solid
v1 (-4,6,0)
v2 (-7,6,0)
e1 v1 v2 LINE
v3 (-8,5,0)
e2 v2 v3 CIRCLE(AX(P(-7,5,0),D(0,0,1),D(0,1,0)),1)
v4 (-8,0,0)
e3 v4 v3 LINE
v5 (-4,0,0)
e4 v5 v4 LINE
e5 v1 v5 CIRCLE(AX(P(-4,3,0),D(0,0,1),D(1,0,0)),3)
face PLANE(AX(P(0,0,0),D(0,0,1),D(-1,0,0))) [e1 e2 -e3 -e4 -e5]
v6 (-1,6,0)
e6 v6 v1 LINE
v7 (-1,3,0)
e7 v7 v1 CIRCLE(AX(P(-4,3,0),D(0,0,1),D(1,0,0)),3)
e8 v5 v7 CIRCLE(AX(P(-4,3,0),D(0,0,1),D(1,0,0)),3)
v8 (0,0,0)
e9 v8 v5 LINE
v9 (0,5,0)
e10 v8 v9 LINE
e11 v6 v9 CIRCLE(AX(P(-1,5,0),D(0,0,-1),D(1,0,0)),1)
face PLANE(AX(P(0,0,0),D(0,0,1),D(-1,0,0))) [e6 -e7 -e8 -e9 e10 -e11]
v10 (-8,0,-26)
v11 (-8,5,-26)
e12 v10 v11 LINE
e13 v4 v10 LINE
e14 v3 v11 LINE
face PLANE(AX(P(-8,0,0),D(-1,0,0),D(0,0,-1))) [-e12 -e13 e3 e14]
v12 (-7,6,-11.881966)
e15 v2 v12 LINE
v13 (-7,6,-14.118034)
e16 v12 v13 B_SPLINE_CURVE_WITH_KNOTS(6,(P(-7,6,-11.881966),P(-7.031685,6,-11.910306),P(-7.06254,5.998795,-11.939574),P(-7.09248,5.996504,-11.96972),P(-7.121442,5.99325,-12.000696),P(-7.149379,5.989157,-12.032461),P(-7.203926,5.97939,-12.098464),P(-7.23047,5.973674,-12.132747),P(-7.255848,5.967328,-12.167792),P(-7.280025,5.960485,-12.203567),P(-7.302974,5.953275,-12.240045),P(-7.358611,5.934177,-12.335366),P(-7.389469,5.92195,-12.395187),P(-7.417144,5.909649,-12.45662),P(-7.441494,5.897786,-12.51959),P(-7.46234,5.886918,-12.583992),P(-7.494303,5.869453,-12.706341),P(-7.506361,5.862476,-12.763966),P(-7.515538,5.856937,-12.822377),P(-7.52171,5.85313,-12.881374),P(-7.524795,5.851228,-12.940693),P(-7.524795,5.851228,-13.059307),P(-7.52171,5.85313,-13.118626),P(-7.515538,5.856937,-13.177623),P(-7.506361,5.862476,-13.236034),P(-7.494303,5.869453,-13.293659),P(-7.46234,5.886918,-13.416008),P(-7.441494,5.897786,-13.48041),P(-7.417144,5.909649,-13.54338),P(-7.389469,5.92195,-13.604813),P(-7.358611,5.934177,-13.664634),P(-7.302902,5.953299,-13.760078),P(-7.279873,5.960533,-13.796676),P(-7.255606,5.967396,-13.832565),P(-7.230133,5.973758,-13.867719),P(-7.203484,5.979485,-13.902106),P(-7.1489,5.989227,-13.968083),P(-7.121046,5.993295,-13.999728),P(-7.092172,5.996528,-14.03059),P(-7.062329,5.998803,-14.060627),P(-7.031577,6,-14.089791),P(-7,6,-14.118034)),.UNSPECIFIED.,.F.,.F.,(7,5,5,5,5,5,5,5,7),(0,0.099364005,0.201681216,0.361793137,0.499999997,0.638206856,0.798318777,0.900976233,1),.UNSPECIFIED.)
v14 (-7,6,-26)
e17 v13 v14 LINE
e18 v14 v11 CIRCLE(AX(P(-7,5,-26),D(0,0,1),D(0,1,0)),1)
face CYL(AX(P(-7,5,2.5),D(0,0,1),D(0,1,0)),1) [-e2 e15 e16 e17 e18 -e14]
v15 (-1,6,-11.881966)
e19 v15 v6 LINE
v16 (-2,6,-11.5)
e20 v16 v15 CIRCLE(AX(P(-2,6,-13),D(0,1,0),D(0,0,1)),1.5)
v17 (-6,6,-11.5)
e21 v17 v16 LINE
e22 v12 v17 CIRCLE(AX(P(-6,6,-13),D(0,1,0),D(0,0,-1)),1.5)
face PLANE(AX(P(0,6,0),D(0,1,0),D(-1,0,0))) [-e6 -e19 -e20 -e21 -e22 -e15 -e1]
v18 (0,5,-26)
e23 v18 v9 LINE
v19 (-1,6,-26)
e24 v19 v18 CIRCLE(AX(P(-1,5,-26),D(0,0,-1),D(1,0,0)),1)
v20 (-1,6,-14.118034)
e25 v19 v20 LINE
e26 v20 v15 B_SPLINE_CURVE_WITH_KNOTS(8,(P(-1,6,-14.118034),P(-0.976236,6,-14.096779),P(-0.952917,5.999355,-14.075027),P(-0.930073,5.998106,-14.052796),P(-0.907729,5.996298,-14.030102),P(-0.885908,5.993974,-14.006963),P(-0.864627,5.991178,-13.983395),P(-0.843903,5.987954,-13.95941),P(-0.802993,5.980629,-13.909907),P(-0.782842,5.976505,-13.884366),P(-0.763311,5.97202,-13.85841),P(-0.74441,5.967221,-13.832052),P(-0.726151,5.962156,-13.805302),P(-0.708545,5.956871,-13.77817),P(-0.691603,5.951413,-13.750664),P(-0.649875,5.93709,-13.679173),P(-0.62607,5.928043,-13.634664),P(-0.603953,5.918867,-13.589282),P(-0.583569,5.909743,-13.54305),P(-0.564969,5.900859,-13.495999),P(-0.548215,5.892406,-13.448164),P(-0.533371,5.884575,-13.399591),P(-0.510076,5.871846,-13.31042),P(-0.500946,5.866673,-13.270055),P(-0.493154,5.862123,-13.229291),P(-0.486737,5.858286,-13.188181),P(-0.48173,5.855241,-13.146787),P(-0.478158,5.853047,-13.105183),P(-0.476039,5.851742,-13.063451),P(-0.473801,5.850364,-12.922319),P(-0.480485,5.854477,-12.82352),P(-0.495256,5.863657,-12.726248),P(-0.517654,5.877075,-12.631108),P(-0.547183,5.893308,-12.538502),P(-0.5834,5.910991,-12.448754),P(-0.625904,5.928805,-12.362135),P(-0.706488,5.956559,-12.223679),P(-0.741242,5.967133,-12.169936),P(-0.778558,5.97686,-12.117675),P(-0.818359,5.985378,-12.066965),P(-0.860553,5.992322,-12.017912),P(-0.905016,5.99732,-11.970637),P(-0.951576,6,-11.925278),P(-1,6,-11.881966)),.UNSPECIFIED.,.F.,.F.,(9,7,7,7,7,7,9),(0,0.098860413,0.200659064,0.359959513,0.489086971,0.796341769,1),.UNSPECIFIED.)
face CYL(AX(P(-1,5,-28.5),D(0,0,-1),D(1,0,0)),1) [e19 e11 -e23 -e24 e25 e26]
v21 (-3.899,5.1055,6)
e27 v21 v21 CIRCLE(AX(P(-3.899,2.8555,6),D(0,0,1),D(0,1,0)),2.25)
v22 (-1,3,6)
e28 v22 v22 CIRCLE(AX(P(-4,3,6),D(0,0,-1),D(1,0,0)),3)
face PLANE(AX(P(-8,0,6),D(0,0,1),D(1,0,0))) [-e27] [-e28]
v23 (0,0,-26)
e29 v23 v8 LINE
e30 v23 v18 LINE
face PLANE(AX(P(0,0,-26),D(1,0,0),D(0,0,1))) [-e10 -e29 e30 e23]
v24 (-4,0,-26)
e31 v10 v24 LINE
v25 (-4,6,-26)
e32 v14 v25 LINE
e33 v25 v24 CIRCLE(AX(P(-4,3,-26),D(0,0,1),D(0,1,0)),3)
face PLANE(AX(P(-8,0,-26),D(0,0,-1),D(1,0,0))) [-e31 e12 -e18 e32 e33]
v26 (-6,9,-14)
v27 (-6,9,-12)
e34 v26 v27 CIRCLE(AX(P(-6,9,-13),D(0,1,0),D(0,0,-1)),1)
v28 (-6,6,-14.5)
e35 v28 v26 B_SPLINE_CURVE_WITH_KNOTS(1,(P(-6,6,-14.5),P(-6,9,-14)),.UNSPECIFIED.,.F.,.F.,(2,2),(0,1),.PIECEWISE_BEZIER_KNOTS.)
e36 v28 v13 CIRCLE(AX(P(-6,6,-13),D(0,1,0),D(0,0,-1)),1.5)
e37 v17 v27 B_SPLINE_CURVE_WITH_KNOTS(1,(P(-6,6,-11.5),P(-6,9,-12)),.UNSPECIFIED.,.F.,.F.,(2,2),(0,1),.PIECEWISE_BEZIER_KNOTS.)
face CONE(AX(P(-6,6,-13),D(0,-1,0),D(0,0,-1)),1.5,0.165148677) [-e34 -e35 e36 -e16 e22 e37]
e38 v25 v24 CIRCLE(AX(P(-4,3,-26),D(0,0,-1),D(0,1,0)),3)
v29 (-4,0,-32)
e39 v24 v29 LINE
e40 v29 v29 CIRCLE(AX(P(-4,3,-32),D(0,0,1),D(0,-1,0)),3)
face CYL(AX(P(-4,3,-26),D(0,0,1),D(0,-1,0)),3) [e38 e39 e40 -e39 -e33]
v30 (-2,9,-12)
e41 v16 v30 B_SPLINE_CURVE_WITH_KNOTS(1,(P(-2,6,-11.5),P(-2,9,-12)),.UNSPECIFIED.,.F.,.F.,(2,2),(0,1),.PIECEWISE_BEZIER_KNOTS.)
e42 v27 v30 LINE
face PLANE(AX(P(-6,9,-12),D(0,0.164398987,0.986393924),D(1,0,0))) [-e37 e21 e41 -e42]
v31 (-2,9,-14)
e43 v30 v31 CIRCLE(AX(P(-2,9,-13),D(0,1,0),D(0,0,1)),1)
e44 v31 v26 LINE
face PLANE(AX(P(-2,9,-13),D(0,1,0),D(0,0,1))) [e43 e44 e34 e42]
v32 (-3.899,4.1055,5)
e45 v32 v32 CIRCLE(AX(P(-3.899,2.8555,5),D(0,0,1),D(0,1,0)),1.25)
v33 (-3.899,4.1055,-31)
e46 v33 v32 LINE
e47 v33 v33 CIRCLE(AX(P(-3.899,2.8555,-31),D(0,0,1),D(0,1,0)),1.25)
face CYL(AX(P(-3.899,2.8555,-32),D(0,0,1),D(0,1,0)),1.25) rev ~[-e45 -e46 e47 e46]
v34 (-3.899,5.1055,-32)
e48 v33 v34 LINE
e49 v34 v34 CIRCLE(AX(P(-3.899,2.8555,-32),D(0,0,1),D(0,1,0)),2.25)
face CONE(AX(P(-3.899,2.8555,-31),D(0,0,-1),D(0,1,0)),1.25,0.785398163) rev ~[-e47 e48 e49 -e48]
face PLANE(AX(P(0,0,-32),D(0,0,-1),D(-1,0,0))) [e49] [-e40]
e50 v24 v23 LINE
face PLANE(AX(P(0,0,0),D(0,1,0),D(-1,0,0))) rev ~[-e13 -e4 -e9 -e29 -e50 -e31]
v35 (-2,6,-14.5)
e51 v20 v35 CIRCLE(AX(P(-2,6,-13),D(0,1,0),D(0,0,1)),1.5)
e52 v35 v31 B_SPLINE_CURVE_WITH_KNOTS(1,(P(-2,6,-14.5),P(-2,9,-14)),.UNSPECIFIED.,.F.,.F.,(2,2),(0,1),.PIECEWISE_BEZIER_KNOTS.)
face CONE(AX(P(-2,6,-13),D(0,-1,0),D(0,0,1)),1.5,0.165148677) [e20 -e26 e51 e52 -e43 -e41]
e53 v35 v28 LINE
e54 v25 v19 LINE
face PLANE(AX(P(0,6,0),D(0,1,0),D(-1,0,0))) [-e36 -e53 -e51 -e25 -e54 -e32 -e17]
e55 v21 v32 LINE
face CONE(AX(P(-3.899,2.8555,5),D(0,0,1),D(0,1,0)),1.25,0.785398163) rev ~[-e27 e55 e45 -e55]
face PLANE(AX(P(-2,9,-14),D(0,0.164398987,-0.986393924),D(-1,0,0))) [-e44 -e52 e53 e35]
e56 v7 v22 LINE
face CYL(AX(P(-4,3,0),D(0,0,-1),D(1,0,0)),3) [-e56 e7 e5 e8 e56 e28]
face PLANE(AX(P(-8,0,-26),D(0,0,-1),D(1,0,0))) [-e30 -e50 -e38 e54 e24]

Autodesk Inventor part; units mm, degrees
ref_plane "YZ Plane" through (0, 0, 0) normal (1, 0, 0) x (0, 1, 0)
ref_plane "XZ Plane" through (0, 0, 0) normal (0, 1, 0) x (-1, 0, 0)
sketch "Sketch1" plane through (0, 0, 0) normal (0, 1, 0) x (-1, 0, 0)
  line L0 (0, 0) -> (8, 0)
  line L1 (8, 0) -> (8, -26)
  line L2 (8, -26) -> (0, -26)
  line L3 (0, -26) -> (0, 0)
  dimension "d0" = 8
  dimension "d1" = 26
extrude "Extrusion1" add sketch "Sketch1" along normal blind 6
sketch "Sketch2" plane through (-8, 0, 0) normal (0, 0, 1) x (1, 0, 0)
  circle A0 centre (4, 3) radius 3
  line L0 (8, 0) -> (0, 0) projected
  line L1 (0, 0) -> (0, 6) projected
  dimension "d4" = 6
  dimension "d5" = 3
  dimension "d6" = 4
extrude "Extrusion2" add sketch "Sketch2" along normal blind 6
sketch "Sketch3" plane through (0, 0, -26) normal (0, 0, -1) x (-1, 0, 0)
  arc A0 (4, 0) -> (4, 6) centre (4, 3) ccw projected
  arc A1 (4, 6) -> (4, 0) centre (4, 3) ccw projected
  circle A2 centre (4, 3) radius 3
  point P0 (0, 0)
extrude "Extrusion3" add sketch "Sketch3" along normal blind 6
ref_plane "Work Plane1" through (0, 9, 0) normal (0, 1, 0) x (1, 0, 0)
sketch "Sketch7" plane through (0, 6, 0) normal (0, 1, 0) x (1, 0, 0)
  line L0 (-2, 13) -> (-6, 13) construction
  line L1 (-4.5266, -6) -> (-4.5266, 32) projected
  line L2 (-2, 14.5) -> (-6, 14.5)
  line L3 (-6, 11.5) -> (-2, 11.5)
  arc A0 (-2, 11.5) -> (-2, 14.5) centre (-2, 13) ccw
  arc A1 (-6, 14.5) -> (-6, 11.5) centre (-6, 13) ccw
  line L4 (-8, 26) -> (-8, 0) projected
  line L5 (-4, 0) -> (0, 0) projected
  point P0 (-4, 13)
  dimension "d26" = 3
  dimension "d27" = 4
  dimension "d28" = 4
  dimension "d29" = 13
sketch "Sketch8" plane through (0, 9, 0) normal (0, 1, 0) x (1, 0, 0)
  line L0 (-2, 13) -> (-6, 13) construction
  line L1 (-2, 14) -> (-6, 14)
  line L2 (-6, 12) -> (-2, 12)
  arc A0 (-2, 12) -> (-2, 14) centre (-2, 13) ccw
  arc A1 (-6, 14) -> (-6, 12) centre (-6, 13) ccw
  line L3 (-4, 13) -> (0, 13) construction
  line L4 (-8, 26) -> (-8, 0) projected
  line L5 (-4, 0) -> (0, 0) projected
  dimension "d30" = 2
  dimension "d31" = 180
  dimension "d32" = 2
  dimension "d33" = 4
  dimension "d34" = 13
loft "Loft1" add profiles "Sketch7", "Sketch8"
hole "Hole2" at (-3.899, 2.8555, -32) direction (0, 0, 1) diameter 2.5 end through all
chamfer "Chamfer1" distance 1 angle 45 1 edges at (-3.899, 1.6055, 6)
chamfer "Chamfer2" distance 1 angle 45 1 edges at (-3.899, 1.6055, -32)
fillet "Fillet1" radius 1 2 edges at (-8, 6, -13) (0, 6, -13)
properties part number "tracks_center" material "ABS Plastic"
